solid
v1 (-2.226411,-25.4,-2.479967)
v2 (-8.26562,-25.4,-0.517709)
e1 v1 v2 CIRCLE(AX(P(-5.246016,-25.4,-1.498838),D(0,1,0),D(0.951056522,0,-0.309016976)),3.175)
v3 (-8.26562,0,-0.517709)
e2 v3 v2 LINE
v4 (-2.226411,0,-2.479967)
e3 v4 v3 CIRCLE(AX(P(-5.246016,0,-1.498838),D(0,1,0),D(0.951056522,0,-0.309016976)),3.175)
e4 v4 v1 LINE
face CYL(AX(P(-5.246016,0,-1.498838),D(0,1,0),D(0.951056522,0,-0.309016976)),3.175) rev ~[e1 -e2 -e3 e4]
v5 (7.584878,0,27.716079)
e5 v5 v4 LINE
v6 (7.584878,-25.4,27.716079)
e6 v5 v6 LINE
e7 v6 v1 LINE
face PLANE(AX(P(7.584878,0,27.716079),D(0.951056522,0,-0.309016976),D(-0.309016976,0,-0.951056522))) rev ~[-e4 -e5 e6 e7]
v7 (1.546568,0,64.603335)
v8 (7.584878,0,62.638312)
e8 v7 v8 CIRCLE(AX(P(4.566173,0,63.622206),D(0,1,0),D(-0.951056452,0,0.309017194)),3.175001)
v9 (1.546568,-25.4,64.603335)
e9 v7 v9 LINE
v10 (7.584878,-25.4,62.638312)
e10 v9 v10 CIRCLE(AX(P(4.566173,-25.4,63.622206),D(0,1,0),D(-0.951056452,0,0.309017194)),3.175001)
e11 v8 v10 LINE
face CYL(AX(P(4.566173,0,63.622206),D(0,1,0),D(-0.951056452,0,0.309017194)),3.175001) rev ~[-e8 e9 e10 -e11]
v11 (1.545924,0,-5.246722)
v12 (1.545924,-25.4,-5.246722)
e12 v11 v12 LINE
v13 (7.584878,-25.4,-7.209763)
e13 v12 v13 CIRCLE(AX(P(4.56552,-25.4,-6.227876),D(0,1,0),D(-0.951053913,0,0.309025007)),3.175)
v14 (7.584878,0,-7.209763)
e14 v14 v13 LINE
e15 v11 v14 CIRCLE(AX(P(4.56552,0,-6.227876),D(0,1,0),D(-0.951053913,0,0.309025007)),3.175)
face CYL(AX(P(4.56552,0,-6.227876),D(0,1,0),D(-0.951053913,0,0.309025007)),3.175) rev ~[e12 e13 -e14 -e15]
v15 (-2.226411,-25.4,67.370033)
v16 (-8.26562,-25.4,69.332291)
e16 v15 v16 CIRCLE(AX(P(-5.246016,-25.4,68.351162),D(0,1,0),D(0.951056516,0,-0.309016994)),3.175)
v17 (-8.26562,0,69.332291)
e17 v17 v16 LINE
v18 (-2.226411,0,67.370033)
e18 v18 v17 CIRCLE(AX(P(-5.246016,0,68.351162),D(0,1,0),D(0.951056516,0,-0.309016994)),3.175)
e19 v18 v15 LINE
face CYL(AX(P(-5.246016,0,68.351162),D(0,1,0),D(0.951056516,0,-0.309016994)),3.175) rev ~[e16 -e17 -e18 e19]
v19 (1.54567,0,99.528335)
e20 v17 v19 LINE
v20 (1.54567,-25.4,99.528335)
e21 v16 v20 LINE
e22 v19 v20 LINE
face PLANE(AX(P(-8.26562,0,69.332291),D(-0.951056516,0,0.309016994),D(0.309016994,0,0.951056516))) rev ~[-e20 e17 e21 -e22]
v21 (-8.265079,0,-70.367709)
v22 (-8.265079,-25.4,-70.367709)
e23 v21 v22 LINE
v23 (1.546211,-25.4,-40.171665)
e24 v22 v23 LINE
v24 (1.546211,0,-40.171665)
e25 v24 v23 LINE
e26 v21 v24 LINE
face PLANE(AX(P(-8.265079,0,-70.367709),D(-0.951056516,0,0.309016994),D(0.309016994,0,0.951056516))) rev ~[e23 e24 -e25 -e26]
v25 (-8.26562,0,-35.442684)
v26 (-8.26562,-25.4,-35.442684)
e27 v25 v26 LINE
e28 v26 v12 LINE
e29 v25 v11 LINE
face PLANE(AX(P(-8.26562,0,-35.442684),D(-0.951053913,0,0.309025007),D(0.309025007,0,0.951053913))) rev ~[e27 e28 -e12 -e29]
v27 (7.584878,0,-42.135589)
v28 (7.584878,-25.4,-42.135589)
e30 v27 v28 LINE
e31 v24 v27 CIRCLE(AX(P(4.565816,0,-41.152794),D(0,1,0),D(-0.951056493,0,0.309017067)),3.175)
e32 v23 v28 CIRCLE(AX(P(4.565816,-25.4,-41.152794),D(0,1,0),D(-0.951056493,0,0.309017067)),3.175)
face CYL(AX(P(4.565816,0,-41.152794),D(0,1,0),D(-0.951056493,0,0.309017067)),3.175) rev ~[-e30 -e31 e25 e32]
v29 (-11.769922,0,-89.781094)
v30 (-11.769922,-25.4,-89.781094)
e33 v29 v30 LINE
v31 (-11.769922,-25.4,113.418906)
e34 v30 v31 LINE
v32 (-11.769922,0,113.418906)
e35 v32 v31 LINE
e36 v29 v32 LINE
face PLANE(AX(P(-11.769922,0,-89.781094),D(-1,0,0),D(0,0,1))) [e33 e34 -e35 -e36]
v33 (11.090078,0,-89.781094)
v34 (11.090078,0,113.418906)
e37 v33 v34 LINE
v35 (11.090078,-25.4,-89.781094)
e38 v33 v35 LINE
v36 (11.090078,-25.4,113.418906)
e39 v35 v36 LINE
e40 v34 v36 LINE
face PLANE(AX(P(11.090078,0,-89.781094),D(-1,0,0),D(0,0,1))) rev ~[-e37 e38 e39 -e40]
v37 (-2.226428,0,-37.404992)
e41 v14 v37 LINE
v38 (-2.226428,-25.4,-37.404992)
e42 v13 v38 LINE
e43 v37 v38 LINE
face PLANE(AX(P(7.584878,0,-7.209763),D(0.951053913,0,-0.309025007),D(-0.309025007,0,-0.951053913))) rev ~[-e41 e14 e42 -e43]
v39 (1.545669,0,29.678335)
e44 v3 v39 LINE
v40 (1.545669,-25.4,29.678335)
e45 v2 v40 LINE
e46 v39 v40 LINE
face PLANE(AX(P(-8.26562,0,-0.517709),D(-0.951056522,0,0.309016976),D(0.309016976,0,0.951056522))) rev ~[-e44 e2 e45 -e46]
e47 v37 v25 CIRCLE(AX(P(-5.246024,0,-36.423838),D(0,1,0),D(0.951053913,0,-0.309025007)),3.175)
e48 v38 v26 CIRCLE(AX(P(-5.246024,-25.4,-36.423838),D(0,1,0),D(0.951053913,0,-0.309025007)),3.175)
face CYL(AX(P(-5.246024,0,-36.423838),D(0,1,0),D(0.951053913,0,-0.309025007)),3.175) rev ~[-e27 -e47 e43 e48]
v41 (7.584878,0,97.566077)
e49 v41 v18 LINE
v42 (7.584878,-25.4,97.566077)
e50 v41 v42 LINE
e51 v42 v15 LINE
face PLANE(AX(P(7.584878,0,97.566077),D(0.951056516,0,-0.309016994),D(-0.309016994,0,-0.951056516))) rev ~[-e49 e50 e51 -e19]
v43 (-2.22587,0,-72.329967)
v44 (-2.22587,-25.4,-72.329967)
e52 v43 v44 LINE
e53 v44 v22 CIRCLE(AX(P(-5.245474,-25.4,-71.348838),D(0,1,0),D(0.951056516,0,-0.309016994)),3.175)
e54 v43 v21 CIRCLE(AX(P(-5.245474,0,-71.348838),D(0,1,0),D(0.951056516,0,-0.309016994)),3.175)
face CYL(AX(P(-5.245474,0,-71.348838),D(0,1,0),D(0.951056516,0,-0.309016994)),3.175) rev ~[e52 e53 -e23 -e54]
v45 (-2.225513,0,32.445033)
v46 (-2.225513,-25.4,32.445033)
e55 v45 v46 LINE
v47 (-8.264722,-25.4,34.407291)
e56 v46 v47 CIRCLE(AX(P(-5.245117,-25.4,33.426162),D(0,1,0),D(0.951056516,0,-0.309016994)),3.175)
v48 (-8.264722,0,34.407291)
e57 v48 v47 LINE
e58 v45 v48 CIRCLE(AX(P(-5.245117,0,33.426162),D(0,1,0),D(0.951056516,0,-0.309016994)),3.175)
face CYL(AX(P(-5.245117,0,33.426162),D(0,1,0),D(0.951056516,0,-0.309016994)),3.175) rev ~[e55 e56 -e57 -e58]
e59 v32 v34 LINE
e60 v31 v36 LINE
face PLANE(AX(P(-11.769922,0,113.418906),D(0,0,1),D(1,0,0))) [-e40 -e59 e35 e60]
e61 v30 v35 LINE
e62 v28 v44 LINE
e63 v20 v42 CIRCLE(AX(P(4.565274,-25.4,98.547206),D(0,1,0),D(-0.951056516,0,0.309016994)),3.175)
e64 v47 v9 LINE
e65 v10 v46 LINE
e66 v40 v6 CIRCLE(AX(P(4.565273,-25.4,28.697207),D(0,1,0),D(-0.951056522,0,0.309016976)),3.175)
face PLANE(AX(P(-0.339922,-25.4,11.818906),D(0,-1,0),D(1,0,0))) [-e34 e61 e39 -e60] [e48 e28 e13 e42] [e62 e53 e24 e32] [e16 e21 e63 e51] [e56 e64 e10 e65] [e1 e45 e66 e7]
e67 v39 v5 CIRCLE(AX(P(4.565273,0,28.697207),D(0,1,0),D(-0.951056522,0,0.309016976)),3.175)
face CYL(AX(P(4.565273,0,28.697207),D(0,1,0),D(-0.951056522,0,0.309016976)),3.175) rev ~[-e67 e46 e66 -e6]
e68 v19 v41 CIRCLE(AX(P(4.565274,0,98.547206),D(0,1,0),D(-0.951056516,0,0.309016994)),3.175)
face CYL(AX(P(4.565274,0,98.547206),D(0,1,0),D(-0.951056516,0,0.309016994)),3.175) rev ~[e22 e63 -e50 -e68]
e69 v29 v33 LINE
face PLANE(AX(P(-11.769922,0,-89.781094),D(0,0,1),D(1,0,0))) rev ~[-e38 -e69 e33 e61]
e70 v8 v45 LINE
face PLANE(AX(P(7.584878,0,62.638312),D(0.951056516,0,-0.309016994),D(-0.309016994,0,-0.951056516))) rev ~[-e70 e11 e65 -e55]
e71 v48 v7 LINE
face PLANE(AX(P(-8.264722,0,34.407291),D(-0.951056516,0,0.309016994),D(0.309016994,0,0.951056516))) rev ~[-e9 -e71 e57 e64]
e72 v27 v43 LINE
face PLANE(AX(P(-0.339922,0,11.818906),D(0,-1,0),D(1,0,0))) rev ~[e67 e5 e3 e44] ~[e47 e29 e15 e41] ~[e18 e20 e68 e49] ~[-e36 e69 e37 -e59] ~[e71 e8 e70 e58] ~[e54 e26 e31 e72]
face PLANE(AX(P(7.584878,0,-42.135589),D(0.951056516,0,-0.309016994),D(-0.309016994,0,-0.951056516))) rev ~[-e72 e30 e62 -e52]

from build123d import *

# Parameters (mm, degrees)
F0_W     = 22.86
F0_H     = 203.2
F1_DEPTH = 25.4


# Not quite as in the source:
# - ends of sketch curves that miss each other by under 0.0002 mm in the source are joined


with BuildPart() as f1:
    # F0 (on Front) → F1 (new body)
    with BuildSketch(Plane.XZ):
        with Locations((-0.3399215189, 11.8189063548)):
            Rectangle(F0_W, F0_H)
        with BuildLine():
            Line((7.5848784811, -7.2097627448), (-2.2264276225, -37.4049924117))
            ThreePointArc((-2.2264276225, -37.4049924117), (-6.2271781929, -39.4434341876), (-8.2656199687, -35.4426836172))
            Line((-8.2656199687, -35.4426836172), (1.5459240038, -5.2467218859))
            ThreePointArc((1.5459240926, -5.2467219148), (5.5470406879, -3.2083990956), (7.5848784811, -7.2097627448))
        make_face(mode=Mode.SUBTRACT)
        with BuildLine():
            Line((7.5848784811, -42.1355889051), (-2.2258696668, -72.3299669673))
            ThreePointArc((-2.2258696668, -72.3299669673), (-6.2266030631, -74.3684424494), (-8.2650785452, -70.367709053))
            Line((-8.2650785452, -70.367709053), (1.5462110262, -40.1716646606))
            ThreePointArc((1.5462110262, -40.1716646606), (5.5477780101, -38.1334601546), (7.5848784811, -42.1355889051))
        make_face(mode=Mode.SUBTRACT)
        with BuildLine():
            Line((7.5848784811, 27.7160793915), (-2.2264110515, -2.4799669119))
            ThreePointArc((-2.2264110515, -2.4799669119), (-6.2271444076, -4.5184424731), (-8.2656199687, -0.517709117))
            Line((-8.2656199687, -0.517709117), (1.5456690059, 29.6783354693))
            ThreePointArc((1.5456690059, 29.6783354693), (5.5464015034, 31.7168113094), (7.5848784811, 27.7160793915))
        make_face(mode=Mode.SUBTRACT)
        with BuildLine():
            Line((7.5848784811, 97.5660773977), (-2.2264110903, 67.3700330053))
            ThreePointArc((-2.2264110903, 67.3700330053), (-6.2271444866, 65.3315575232), (-8.2656199687, 69.3322909196))
            Line((-8.2656199687, 69.3322909196), (1.5456696027, 99.528335312))
            ThreePointArc((1.5456696027, 99.528335312), (5.546402999, 101.5668107941), (7.5848784811, 97.5660773977))
        make_face(mode=Mode.SUBTRACT)
        with BuildLine():
            Line((7.5848784811, 62.6383122648), (-2.2255126404, 32.4450330169))
            ThreePointArc((-2.2255126404, 32.4450330169), (-6.2262460368, 30.4065575348), (-8.2647215189, 34.4072909311))
            Line((-8.2647215189, 34.4072909311), (1.5465680525, 64.6033353235))
            ThreePointArc((1.5465680525, 64.6033353235), (5.5486851845, 66.6413608527), (7.5848784811, 62.6383122648))
        make_face(mode=Mode.SUBTRACT)
    extrude(amount=F1_DEPTH)


solid = f1.part
